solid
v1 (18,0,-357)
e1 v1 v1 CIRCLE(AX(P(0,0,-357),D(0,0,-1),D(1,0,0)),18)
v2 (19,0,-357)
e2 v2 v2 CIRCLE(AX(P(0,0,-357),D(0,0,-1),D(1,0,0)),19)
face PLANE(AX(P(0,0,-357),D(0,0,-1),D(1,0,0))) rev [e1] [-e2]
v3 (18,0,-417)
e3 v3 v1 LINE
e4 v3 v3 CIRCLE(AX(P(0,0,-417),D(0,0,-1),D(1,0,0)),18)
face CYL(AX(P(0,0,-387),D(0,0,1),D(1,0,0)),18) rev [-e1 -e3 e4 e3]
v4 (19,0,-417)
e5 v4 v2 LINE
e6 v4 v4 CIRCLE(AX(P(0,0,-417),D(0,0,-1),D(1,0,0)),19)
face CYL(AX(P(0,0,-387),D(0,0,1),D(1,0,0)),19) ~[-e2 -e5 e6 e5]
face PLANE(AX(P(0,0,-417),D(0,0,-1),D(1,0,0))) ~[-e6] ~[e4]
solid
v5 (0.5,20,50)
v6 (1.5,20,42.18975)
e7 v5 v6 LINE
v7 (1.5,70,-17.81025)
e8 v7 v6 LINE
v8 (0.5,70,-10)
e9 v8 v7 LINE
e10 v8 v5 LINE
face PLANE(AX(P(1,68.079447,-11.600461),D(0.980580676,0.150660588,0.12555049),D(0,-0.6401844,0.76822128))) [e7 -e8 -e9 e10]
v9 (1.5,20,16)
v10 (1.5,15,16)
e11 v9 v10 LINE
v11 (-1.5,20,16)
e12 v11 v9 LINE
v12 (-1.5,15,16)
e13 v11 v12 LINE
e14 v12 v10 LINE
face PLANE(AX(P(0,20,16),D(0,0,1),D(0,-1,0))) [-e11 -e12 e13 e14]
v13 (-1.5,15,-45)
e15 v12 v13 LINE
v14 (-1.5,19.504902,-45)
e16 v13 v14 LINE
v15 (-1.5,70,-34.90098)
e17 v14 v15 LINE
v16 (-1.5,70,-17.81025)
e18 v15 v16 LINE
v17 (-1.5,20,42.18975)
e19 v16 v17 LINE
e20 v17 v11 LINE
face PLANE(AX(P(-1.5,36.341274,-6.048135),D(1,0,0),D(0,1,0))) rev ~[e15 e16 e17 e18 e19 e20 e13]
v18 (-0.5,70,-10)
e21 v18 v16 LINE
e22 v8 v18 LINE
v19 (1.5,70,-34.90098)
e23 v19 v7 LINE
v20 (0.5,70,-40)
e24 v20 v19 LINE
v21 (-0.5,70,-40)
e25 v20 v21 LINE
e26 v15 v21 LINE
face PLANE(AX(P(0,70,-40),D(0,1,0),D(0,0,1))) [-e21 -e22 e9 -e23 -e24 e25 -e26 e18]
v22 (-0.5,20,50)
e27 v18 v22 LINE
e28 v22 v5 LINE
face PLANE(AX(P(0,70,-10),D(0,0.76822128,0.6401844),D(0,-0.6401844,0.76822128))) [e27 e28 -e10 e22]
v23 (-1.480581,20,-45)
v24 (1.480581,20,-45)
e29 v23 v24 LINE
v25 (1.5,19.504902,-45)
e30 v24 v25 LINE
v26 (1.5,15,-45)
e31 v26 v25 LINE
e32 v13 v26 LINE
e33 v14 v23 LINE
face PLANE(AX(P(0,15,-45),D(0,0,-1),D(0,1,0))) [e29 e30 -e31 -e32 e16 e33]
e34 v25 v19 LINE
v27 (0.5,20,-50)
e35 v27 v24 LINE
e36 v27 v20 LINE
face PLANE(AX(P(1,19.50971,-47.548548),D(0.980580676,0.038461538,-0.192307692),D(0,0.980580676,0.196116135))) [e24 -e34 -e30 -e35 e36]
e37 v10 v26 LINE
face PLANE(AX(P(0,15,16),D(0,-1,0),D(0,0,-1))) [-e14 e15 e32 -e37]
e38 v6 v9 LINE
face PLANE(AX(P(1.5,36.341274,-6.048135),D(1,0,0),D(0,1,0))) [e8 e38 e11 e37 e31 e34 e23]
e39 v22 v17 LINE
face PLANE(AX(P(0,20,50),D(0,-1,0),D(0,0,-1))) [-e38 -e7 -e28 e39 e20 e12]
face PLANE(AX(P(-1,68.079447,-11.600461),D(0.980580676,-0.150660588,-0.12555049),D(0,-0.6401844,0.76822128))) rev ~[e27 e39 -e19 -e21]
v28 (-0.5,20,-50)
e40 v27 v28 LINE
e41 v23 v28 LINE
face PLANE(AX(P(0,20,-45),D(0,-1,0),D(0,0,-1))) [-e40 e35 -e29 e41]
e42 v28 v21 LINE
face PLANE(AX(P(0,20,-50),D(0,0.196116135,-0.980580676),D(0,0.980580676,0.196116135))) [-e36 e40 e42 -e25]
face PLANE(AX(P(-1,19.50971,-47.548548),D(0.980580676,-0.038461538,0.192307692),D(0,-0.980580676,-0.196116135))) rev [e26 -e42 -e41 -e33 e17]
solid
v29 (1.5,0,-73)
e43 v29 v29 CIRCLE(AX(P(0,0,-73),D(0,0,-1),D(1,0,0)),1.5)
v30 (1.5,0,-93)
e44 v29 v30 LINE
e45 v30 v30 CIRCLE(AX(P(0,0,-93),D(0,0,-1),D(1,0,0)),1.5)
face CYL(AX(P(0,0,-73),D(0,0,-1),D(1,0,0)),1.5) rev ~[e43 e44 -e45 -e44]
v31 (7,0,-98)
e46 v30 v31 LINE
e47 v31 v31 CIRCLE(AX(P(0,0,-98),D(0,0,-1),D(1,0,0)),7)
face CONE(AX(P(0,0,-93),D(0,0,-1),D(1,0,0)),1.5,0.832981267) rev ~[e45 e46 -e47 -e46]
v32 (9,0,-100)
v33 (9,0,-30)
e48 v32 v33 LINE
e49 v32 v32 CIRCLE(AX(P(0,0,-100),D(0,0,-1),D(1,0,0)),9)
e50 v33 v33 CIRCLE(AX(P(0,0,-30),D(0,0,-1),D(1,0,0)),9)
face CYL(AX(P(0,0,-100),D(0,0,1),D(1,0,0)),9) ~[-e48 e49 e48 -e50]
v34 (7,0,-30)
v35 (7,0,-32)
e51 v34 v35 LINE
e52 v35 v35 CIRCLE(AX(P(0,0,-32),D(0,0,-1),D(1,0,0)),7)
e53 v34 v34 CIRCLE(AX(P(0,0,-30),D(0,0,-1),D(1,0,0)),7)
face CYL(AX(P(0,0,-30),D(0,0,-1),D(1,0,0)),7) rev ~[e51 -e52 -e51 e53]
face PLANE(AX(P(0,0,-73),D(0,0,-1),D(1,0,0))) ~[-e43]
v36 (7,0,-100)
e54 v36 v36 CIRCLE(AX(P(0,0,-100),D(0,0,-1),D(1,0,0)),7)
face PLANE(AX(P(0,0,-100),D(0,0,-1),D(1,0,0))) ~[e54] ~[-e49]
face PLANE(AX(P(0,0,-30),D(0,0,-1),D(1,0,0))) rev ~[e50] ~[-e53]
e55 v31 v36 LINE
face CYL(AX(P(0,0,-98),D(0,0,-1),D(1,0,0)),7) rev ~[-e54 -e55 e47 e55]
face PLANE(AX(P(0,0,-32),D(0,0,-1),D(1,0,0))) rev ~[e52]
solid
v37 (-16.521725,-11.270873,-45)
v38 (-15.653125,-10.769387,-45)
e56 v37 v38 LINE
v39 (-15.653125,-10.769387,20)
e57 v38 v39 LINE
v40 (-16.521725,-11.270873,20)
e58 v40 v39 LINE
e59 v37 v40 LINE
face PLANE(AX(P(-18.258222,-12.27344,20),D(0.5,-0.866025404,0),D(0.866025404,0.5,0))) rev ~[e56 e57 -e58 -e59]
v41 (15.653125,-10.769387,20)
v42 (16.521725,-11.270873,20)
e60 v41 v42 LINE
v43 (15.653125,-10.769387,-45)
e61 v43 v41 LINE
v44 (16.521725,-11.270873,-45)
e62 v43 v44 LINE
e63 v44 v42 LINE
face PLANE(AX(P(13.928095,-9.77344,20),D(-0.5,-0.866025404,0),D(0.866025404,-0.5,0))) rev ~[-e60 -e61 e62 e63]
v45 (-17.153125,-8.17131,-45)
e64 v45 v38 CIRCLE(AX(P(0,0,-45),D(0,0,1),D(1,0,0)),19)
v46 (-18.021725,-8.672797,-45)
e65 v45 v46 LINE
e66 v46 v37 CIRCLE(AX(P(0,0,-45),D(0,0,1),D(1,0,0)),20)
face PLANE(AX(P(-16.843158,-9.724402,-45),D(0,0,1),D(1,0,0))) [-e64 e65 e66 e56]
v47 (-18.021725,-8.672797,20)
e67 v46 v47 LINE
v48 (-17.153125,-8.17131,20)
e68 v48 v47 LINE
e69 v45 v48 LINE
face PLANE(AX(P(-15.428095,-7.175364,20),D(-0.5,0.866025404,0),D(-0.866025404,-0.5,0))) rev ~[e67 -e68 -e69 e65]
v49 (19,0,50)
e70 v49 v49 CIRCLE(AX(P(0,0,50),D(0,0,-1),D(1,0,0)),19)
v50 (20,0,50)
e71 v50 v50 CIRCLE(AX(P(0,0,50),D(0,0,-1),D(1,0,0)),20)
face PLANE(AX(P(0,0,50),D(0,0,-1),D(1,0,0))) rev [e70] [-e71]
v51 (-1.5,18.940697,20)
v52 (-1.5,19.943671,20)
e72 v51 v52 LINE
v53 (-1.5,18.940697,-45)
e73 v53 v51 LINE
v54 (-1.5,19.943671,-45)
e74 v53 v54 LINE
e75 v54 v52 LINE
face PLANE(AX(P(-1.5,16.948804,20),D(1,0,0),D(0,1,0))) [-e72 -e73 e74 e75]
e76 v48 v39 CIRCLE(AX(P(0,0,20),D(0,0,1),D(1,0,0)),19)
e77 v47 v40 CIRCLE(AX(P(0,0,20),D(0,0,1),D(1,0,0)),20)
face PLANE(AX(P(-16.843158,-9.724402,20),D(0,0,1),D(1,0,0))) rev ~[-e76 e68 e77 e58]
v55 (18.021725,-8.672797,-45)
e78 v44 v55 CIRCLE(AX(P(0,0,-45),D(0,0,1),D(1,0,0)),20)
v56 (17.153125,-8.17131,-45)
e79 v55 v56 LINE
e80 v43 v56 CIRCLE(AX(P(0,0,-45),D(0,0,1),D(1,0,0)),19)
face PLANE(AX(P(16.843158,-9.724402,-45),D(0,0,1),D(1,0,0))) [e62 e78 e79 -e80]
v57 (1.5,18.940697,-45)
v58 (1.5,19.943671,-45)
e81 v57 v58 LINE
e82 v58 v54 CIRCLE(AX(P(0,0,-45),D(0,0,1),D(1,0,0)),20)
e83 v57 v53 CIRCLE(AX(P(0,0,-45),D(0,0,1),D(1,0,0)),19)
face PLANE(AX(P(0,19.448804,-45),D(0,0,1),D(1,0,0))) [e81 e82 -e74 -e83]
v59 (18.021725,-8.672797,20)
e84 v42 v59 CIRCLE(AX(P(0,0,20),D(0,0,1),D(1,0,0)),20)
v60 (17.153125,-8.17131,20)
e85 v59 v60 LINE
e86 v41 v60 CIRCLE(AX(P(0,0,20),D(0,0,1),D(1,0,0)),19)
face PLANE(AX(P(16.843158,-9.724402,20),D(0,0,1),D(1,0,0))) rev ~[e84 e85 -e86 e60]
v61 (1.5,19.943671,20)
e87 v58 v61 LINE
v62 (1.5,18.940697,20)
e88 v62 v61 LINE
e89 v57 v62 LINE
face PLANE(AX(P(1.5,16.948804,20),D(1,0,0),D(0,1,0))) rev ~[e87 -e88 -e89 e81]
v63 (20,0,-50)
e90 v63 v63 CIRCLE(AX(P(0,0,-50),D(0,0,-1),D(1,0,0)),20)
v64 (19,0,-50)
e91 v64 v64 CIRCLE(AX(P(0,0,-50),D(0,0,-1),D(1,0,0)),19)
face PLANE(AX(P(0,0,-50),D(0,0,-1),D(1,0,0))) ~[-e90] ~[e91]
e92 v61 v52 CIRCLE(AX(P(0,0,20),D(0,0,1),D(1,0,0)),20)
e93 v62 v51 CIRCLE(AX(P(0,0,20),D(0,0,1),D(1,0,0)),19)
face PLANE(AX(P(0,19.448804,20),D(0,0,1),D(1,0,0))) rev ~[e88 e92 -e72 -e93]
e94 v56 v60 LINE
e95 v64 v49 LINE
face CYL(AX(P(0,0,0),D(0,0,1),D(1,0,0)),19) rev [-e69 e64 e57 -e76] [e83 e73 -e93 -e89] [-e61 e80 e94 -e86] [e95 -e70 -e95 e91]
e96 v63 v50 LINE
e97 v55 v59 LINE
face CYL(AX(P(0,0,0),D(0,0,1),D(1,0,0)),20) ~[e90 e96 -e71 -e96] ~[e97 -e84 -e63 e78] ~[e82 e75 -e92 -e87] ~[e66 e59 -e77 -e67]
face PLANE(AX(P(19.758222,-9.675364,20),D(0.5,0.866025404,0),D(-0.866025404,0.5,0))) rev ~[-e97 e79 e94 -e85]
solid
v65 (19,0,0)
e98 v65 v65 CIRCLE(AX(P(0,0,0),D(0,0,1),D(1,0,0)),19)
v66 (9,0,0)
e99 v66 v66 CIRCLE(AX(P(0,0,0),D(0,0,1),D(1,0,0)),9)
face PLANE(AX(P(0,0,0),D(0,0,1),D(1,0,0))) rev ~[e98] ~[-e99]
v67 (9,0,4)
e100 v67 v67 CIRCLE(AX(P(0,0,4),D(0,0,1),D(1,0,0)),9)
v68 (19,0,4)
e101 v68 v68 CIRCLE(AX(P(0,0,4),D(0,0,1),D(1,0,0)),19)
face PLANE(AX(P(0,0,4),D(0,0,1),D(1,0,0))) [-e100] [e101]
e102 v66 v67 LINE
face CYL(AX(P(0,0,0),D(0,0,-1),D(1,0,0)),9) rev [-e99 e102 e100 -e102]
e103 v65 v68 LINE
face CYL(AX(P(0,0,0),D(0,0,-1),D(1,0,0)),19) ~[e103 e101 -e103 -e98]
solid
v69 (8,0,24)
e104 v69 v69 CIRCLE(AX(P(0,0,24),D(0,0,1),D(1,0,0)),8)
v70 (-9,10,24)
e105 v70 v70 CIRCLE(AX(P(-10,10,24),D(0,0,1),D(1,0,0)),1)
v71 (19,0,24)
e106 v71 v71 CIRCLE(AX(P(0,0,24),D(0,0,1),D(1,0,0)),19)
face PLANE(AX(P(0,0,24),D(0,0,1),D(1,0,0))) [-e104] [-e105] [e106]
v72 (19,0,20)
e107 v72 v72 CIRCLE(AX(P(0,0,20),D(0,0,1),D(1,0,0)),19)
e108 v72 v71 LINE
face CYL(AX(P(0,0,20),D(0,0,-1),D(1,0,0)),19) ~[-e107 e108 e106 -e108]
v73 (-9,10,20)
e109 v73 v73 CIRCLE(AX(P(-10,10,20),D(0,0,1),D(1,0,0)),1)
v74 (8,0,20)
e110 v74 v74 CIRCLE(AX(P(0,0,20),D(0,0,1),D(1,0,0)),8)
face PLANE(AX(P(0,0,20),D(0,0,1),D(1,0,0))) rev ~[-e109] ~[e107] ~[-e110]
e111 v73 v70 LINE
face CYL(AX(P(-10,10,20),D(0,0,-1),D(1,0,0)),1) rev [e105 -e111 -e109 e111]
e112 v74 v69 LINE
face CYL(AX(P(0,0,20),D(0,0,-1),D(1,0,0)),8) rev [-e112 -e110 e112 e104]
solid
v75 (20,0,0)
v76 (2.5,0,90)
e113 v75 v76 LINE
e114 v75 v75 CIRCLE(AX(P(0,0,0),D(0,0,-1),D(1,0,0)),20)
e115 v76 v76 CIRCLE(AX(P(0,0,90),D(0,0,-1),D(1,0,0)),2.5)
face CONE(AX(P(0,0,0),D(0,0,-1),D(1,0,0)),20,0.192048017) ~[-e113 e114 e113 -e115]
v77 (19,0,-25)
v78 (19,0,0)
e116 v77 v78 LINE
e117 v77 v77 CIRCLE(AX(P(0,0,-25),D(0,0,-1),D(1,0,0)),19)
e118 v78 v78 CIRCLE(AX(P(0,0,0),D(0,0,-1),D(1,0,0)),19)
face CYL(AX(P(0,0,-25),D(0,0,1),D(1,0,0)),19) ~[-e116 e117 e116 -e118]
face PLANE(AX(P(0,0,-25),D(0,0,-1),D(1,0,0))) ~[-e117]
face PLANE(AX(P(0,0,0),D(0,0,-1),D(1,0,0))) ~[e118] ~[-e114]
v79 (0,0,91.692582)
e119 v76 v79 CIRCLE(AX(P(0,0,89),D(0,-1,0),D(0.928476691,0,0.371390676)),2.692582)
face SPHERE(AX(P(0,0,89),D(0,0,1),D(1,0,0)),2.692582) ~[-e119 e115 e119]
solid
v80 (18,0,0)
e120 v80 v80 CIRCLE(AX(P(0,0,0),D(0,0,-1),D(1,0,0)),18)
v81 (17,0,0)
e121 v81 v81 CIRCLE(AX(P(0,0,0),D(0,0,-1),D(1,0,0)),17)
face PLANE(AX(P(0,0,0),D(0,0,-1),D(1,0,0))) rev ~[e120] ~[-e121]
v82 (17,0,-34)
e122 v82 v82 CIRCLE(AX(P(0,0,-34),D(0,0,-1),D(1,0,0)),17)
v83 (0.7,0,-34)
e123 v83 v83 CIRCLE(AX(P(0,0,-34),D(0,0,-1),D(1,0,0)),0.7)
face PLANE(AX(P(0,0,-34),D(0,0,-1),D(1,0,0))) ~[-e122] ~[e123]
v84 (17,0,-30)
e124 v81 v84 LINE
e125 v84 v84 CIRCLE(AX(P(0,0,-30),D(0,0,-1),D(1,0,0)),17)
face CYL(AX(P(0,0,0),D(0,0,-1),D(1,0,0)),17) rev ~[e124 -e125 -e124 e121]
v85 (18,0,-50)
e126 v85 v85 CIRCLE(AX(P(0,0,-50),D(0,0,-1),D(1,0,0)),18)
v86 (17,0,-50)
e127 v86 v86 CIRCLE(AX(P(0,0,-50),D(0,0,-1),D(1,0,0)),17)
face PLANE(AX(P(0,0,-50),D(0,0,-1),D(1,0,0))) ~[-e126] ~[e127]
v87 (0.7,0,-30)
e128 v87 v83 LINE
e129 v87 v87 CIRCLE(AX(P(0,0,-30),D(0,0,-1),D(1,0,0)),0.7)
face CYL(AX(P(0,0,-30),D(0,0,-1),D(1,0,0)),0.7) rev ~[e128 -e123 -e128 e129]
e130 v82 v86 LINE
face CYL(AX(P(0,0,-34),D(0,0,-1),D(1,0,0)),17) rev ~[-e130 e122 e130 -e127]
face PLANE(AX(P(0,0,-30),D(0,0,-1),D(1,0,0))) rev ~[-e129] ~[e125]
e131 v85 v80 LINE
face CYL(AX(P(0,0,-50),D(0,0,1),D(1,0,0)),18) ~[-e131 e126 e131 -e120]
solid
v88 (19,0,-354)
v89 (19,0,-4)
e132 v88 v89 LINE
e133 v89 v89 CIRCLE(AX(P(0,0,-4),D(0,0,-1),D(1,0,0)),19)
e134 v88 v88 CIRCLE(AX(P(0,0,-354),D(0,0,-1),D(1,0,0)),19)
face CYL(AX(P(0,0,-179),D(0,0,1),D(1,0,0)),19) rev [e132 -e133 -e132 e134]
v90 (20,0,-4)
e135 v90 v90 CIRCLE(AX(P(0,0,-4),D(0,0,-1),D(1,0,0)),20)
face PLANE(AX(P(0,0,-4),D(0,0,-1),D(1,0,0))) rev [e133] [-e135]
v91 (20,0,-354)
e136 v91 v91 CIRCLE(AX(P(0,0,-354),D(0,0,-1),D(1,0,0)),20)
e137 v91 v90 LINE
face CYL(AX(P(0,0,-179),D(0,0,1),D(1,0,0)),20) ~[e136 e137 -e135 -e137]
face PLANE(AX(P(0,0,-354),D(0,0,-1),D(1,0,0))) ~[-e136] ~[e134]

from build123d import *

# Parameters (mm, degrees)
F2_W         = 1
F2_H         = 350
F4_W         = 1
F4_H         = 60
F8_W         = 1
F8_H         = 100
F11_W        = 3
F11_H        = 5
F12_DEPTH    = 65
F14_DEPTH    = 1.5
F15_C1_SIZE2 = 5
F15_C1_SIZE  = 1
F15_C2_SIZE2 = 5
F15_C2_SIZE  = 1
F15_C3_SIZE2 = 1
F15_C3_SIZE  = 5
F15_C4_SIZE2 = 5
F15_C4_SIZE  = 1
F17_R        = 19
F17_R_2      = 9
F18_DEPTH    = 4
F19_R        = 19
F19_R_2      = 1
F19_R_3      = 8
F20_DEPTH    = 4


# Not quite as in the source:
# - two fillets or chamfers of one size are made in one step


with BuildPart() as f1:
    # F0 (on Front) → F1 (revolve)
    with BuildSketch(Plane.XZ):
        with BuildLine():
            Line((0, 91.6925824036), (0, -25))
            Line((0, -25), (19, -25))
            Line((19, -25), (19, 0))
            Line((19, 0), (20, 0))
            Line((20, 0), (2.5, 90))
            ThreePointArc((2.5, 90), (1.5095392669, 91.2296392537), (0, 91.6925824036))
        make_face()
    revolve(axis=Axis((0, 0, 33.3462912018), (0, 0, -1)))


with BuildPart() as f3:
    # F2 (on Front) → F3 (revolve)
    with BuildSketch(Plane.XZ):
        with Locations((19.5, -179)):
            Rectangle(F2_W, F2_H)
    revolve(axis=Axis((0, 0, -177), (0, 0, -1)))


with BuildPart() as f5:
    # F4 (on Front) → F5 (revolve)
    with BuildSketch(Plane.XZ):
        with Locations((18.5, -387)):
            Rectangle(F4_W, F4_H)
    revolve(axis=Axis((0, 0, -341.6038751602), (0, 0, -1)))


with BuildPart() as f7:
    # F6 (on Front) → F7 (revolve)
    with BuildSketch(Plane.XZ):
        Polygon((18, 0), (17, 0), (17, -30), (0.7, -30), (0.7, -34), (17, -34), (17, -50), (18, -50), align=None)
    revolve(axis=Axis((0, 0, -50), (0, 0, -1)))


with BuildPart() as f9:
    # F8 (on Front) → F9 (revolve)
    with BuildSketch(Plane.XZ):
        with Locations((19.5, 0)):
            Rectangle(F8_W, F8_H)
    revolve(axis=Axis((0, 0, 0), (0, 0, -1)))

    # F11 (on offset) → F12 (cut)
    with BuildSketch(Plane.XY.offset(20)):
        Polygon((-19.7582219053, -9.6753639281), (-18.2582219053, -12.2734401395), (-13.9280948863, -9.7734401395), (-15.4280948863, -7.1753639281), align=None)
        Polygon((18.2582219053, -12.2734401395), (19.7582219053, -9.6753639281), (15.4280948863, -7.1753639281), (13.9280948863, -9.7734401395), align=None)
        with Locations((0, 19.4488040676)):
            Rectangle(F11_W, F11_H)
    extrude(amount=-F12_DEPTH, mode=Mode.SUBTRACT)


with BuildPart() as f14:
    # F13 (on Right) → F14 (new body, symmetric)
    with BuildSketch(Plane.YZ):
        Polygon((70, -10), (20, 50), (20, 16), (15, 16), (15, -45), (20, -45), (20, -50), (70, -40), align=None)
    extrude(amount=F14_DEPTH, both=True)

    # F15: chamfer of 1 x 5 on 4 edges, made by hand

    # F15_c1
    f15_c1_edges = [f14.edges().sort_by_distance(p)[0] for p in [
        (-1.5, 45, 20),
    ]]
    f15_c1_side = f14.faces().sort_by_distance((-1.48, 45, 20))[0]
    chamfer(f15_c1_edges, length=F15_C1_SIZE, length2=F15_C1_SIZE2, reference=f15_c1_side)

    # F15_c2
    f15_c2_edges = [f14.edges().sort_by_distance(p)[0] for p in [
        (1.5, 45, 20),
    ]]
    f15_c2_side = f14.faces().sort_by_distance((1.48, 45, 20))[0]
    chamfer(f15_c2_edges, length=F15_C2_SIZE, length2=F15_C2_SIZE2, reference=f15_c2_side)

    # F15_c3
    f15_c3_edges = [f14.edges().sort_by_distance(p)[0] for p in [
        (-1.5, 45, -45),
    ]]
    f15_c3_side = f14.faces().sort_by_distance((-1.5, 44.9960776773, -44.9803883865))[0]
    chamfer(f15_c3_edges, length=F15_C3_SIZE, length2=F15_C3_SIZE2, reference=f15_c3_side)

    # F15_c4
    f15_c4_edges = [f14.edges().sort_by_distance(p)[0] for p in [
        (1.5, 45, -45),
    ]]
    f15_c4_side = f14.faces().sort_by_distance((1.48, 45, -45))[0]
    chamfer(f15_c4_edges, length=F15_C4_SIZE, length2=F15_C4_SIZE2, reference=f15_c4_side)


with BuildPart() as f18:
    # F17 (on Top) → F18 (new body)
    with BuildSketch(Plane.XY):
        Circle(F17_R)
        Circle(F17_R_2, mode=Mode.SUBTRACT)
    extrude(amount=F18_DEPTH)


with BuildPart() as f20:
    # F19 (on offset) → F20 (new body)
    with BuildSketch(Plane.XY.offset(20)):
        Circle(F19_R)
        with Locations((-10, 10)):
            Circle(F19_R_2, mode=Mode.SUBTRACT)
        Circle(F19_R_3, mode=Mode.SUBTRACT)
    extrude(amount=F20_DEPTH)


with BuildPart() as f22:
    # F21 (on Front) → F22 (revolve)
    with BuildSketch(Plane.XZ):
        Polygon((7, -32), (0, -32), (0, -73), (1.5, -73), (1.5, -93), (7, -98), (7, -100), (9, -100), (9, -30), (7, -30), align=None)
    revolve(axis=Axis((0, 0, -65), (0, 0, -1)))


solid = Compound([f1.part, f3.part, f5.part, f7.part, f9.part, f14.part, f18.part, f20.part, f22.part])
